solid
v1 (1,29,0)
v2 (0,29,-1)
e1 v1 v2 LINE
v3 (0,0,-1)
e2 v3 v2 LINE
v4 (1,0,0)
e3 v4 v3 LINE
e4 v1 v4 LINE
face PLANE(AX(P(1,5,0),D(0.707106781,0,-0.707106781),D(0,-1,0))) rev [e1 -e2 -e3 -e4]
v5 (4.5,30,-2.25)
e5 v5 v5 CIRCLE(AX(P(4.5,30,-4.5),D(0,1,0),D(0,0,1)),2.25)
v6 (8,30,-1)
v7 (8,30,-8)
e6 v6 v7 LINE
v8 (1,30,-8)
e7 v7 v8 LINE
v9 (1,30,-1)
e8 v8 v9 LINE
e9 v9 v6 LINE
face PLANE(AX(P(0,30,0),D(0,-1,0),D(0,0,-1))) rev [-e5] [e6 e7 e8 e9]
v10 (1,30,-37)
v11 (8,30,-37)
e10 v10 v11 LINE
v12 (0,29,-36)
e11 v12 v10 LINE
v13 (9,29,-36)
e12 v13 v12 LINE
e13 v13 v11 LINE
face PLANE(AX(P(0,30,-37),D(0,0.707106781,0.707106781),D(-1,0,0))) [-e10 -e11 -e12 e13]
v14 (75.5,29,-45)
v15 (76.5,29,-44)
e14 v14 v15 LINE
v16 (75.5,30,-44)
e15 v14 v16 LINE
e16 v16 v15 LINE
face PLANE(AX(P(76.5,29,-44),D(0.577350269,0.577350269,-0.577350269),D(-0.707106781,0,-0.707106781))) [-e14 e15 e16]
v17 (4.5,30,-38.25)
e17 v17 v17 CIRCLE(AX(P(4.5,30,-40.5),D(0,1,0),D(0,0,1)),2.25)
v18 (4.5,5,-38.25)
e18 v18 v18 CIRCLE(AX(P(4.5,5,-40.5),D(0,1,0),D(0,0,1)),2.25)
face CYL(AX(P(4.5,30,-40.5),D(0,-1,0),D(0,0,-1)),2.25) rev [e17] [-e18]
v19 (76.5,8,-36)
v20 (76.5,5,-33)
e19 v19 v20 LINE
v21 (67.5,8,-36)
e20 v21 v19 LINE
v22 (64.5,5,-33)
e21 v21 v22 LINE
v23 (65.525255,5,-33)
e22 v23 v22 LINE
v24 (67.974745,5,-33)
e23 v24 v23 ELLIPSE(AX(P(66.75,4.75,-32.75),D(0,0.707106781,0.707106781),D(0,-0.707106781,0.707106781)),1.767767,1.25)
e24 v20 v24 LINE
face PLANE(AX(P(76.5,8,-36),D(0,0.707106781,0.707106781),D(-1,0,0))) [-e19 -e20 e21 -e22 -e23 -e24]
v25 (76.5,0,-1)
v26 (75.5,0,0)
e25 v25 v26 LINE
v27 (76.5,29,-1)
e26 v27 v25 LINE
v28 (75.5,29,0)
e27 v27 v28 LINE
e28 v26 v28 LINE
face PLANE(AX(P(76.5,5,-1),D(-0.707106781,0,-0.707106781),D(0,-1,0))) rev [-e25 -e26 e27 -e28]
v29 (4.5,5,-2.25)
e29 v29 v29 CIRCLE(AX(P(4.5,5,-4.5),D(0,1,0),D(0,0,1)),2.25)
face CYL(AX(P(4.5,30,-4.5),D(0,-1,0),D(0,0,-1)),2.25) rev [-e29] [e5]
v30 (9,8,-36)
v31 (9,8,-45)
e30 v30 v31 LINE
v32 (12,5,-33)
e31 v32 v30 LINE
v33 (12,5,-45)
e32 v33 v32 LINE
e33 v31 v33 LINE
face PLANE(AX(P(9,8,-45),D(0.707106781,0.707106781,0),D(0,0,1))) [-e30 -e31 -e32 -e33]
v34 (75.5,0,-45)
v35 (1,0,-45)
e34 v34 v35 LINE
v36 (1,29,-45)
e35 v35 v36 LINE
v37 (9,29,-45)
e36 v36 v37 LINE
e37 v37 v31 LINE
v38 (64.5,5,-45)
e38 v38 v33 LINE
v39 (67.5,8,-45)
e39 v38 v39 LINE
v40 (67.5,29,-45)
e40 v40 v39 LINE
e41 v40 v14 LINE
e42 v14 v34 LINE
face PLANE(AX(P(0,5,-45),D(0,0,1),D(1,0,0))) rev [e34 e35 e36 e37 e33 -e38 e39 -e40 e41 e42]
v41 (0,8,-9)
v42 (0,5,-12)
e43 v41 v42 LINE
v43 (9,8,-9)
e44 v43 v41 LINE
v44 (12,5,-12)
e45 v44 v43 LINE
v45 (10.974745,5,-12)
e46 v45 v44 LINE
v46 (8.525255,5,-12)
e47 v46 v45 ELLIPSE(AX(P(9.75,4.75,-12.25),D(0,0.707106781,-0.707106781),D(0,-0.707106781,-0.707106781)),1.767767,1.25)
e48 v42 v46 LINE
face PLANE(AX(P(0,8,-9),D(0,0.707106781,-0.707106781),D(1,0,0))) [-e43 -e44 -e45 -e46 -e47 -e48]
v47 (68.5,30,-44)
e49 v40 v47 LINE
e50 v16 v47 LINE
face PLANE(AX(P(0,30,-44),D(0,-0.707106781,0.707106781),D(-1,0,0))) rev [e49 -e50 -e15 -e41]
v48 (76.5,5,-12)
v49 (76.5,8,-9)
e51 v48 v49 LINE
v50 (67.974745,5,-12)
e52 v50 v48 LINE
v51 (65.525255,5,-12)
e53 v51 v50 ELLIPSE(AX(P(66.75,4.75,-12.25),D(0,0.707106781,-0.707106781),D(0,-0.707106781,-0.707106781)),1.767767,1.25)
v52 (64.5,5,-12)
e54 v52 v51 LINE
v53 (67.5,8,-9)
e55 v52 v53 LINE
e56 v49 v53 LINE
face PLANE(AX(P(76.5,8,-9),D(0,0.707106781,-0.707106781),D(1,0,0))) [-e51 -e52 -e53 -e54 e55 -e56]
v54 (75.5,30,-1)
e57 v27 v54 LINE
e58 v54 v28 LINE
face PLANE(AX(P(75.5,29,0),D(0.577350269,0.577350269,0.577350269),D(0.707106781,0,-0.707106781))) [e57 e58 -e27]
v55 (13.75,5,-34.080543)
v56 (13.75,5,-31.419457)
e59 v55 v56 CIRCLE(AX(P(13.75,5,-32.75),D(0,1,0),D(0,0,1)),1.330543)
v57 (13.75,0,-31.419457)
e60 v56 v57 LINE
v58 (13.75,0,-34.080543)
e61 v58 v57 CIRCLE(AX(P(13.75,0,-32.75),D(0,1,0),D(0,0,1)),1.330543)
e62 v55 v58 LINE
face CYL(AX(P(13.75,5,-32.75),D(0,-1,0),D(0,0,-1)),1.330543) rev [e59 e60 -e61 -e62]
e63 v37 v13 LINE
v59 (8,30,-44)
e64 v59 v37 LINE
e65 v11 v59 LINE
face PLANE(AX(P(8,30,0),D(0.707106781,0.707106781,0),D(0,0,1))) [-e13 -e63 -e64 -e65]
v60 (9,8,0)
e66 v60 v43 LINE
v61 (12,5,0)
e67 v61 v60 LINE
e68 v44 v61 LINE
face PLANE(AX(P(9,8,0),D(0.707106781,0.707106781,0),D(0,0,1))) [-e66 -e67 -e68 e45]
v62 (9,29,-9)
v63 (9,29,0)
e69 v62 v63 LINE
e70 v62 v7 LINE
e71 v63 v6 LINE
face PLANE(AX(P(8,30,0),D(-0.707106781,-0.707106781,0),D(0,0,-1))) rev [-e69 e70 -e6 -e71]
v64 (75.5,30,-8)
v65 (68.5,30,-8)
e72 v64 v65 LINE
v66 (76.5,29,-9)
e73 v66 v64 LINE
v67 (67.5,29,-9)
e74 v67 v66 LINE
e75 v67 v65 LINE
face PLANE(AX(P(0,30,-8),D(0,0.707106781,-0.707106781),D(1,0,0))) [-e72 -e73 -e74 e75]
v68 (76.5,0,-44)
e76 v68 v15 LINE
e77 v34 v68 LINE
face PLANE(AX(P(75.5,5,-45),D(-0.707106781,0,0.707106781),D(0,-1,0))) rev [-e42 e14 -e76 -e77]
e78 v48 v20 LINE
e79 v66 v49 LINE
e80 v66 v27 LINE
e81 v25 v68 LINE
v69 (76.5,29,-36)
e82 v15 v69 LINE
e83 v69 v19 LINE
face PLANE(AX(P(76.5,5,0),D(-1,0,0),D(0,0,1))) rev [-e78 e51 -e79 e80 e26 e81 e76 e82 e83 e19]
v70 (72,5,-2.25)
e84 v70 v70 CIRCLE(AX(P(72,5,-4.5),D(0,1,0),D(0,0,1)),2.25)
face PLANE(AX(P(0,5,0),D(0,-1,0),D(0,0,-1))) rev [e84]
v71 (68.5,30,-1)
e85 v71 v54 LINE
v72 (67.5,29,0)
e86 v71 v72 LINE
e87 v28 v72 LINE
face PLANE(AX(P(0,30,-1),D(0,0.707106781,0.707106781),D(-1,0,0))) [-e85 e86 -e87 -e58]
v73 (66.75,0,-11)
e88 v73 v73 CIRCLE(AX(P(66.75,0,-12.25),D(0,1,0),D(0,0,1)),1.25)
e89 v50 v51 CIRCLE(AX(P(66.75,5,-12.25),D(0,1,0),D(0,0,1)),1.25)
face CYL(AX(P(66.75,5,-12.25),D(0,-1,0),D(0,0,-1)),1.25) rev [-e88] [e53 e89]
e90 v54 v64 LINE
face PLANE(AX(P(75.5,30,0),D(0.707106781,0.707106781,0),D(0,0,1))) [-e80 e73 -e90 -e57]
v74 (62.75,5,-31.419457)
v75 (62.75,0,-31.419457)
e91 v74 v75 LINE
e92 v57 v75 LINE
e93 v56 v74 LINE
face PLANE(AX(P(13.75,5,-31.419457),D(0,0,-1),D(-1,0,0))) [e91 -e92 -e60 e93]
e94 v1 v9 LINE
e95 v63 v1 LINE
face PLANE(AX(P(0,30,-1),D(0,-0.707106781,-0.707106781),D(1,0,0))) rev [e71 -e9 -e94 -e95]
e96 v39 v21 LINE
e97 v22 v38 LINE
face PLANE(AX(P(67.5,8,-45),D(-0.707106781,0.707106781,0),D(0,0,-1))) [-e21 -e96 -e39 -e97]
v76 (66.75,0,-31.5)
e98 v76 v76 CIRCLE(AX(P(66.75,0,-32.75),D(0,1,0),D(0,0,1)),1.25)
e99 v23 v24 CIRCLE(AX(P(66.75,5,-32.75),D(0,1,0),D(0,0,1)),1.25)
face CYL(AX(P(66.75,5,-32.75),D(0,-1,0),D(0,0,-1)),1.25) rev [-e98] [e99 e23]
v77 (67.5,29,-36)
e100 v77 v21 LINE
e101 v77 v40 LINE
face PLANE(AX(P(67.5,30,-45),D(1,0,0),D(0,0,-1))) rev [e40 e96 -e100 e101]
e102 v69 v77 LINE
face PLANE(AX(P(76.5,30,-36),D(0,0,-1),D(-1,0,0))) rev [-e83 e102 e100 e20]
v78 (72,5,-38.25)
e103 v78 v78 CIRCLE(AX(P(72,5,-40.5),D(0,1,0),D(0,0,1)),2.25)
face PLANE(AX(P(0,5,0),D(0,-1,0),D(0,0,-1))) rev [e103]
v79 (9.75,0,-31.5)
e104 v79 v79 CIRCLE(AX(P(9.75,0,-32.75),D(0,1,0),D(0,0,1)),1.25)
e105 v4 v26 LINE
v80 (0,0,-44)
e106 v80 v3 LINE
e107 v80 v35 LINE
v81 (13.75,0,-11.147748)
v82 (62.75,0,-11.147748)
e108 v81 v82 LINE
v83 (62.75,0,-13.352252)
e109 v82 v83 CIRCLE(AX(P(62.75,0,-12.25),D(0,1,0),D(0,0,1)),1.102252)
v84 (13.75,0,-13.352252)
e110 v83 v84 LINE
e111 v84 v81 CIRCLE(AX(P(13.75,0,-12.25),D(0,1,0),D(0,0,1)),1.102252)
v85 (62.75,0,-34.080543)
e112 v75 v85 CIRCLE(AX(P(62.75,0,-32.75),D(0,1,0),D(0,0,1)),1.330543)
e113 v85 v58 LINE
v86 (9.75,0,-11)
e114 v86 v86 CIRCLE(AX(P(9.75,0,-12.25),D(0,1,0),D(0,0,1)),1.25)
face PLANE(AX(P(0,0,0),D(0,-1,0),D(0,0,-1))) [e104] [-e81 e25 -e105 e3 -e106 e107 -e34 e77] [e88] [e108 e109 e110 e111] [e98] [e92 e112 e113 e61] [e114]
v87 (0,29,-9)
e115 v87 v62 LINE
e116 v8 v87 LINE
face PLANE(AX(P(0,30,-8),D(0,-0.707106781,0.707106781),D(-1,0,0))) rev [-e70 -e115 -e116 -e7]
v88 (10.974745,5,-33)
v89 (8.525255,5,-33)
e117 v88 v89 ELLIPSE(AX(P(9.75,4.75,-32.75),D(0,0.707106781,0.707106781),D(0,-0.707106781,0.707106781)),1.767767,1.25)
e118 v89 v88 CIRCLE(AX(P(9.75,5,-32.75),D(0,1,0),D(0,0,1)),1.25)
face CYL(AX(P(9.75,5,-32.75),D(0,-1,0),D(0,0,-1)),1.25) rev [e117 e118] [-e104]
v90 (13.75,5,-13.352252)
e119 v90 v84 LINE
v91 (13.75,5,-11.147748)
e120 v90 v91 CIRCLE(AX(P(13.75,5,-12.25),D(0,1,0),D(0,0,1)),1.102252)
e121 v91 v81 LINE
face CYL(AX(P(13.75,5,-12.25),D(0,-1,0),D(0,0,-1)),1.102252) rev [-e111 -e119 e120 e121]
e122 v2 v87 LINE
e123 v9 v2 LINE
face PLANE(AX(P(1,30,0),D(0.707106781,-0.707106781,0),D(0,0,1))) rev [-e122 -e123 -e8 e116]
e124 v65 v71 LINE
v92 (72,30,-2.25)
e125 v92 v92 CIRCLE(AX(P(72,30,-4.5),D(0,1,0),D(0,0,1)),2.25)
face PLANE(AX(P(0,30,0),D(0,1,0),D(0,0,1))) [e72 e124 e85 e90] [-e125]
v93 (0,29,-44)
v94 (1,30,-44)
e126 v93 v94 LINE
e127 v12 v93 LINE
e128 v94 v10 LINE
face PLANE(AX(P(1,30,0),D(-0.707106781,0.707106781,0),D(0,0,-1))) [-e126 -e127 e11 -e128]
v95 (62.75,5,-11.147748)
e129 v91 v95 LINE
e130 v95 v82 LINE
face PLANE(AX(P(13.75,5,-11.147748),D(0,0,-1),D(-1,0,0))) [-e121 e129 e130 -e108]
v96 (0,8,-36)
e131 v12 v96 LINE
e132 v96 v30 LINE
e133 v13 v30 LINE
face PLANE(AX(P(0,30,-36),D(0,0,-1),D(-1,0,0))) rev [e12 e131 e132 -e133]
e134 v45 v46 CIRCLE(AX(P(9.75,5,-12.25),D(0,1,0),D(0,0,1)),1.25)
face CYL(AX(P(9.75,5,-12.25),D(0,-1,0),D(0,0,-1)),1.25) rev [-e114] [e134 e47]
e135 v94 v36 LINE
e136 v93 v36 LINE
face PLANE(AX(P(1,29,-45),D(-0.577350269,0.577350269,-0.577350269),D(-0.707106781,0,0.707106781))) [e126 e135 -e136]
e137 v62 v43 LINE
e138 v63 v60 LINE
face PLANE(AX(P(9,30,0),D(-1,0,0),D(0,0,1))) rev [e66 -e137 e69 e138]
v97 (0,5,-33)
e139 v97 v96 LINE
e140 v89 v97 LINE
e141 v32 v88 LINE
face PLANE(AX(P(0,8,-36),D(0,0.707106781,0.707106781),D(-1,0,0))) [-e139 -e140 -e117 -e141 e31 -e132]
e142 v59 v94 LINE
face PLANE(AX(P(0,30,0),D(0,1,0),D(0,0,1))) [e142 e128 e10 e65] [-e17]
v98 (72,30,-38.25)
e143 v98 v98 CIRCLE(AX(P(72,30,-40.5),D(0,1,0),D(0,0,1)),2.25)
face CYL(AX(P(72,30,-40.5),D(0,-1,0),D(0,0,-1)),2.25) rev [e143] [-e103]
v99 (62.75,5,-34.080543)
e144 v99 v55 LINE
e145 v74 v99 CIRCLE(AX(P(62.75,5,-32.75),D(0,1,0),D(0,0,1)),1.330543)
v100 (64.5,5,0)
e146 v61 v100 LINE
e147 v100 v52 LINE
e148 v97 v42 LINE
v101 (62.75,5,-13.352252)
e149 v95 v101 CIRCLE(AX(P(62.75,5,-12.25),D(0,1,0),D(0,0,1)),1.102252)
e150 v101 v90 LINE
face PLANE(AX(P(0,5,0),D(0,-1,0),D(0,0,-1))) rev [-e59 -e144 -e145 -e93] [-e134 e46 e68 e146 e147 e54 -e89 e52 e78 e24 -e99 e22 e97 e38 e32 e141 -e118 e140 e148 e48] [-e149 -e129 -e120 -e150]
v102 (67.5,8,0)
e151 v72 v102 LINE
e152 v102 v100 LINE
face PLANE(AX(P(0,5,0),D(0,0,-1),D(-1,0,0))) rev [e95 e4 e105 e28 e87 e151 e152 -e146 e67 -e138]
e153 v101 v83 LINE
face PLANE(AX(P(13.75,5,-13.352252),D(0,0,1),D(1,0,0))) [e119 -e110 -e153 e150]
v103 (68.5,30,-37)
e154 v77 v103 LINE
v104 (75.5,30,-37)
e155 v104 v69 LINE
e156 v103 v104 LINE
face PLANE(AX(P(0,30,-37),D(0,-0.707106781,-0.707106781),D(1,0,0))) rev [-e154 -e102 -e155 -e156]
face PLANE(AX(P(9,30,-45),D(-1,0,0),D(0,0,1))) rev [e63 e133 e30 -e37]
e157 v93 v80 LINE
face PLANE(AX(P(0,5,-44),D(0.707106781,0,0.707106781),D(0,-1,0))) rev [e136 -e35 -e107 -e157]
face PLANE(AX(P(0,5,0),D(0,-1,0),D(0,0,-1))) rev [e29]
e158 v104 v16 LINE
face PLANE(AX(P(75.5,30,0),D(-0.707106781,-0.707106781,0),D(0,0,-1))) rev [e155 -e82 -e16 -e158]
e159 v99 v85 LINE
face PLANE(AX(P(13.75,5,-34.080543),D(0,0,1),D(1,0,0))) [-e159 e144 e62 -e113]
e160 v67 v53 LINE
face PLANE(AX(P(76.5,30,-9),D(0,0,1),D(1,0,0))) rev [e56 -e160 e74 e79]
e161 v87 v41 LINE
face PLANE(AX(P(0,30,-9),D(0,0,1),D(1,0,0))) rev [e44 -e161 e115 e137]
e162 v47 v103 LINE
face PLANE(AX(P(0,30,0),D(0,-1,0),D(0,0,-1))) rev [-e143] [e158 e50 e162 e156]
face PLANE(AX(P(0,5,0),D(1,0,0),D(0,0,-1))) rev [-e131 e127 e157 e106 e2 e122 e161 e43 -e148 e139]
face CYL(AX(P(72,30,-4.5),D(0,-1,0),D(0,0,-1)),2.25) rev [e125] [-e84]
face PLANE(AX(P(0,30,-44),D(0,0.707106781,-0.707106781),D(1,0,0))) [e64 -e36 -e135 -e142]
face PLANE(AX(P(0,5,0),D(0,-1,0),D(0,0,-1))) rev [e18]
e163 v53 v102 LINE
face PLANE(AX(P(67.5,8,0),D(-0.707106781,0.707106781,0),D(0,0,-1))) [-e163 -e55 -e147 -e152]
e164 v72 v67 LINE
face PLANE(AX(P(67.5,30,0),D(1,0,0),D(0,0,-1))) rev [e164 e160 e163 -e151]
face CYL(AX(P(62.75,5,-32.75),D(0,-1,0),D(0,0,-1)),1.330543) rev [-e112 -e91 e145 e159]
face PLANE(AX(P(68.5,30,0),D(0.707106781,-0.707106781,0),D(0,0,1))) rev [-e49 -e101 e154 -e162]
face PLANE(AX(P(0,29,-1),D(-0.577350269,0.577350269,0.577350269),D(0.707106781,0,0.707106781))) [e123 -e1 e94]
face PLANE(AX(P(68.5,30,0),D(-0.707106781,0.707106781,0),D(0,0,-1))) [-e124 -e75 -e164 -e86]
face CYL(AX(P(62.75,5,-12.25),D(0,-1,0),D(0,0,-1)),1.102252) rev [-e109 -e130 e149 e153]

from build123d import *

# Parameters (mm, degrees)
SKETCH1_W           = 76.5
SKETCH1_H           = 45
SKETCH1_R           = 1.25
BOSS_EXTRUDE1_DEPTH = 5
SKETCH2_W           = 9
SKETCH2_H           = 9
SKETCH2_R           = 2.25
BOSS_EXTRUDE2_DEPTH = 25
CHAMFER1_SIZE       = 1
CHAMFER2_SIZE       = 3


with BuildPart() as part:
    # Sketch1 → Boss-Extrude1 (new body)
    with BuildSketch(Plane(origin=(0, 0, 0), x_dir=(1, 0, 0), z_dir=(0, 1, 0))):
        with Locations((38.25, 22.5)):
            Rectangle(SKETCH1_W, SKETCH1_H)
        with Locations(Location((9.75, 32.75, 0), (0, 0, 270))):
            Circle(SKETCH1_R, mode=Mode.SUBTRACT)
        with Locations(Location((9.75, 12.25, 0), (0, 0, 270))):
            Circle(SKETCH1_R, mode=Mode.SUBTRACT)
        with Locations(Location((66.75, 12.25, 0), (0, 0, 270))):
            Circle(SKETCH1_R, mode=Mode.SUBTRACT)
        with Locations(Location((66.75, 32.75, 0), (0, 0, 270))):
            Circle(SKETCH1_R, mode=Mode.SUBTRACT)
        with BuildLine():
            Line((13.75, 34.080542855), (62.75, 34.080542855))
            ThreePointArc((62.75, 34.080542855), (64.080542855, 32.75), (62.75, 31.419457145))
            Line((62.75, 31.419457145), (13.75, 31.419457145))
            ThreePointArc((13.75, 31.419457145), (12.419457145, 32.75), (13.75, 34.080542855))
        make_face(mode=Mode.SUBTRACT)
        with BuildLine():
            Line((13.75, 13.352251527), (62.75, 13.352251527))
            ThreePointArc((62.75, 13.352251527), (63.852251527, 12.25), (62.75, 11.147748473))
            Line((62.75, 11.147748473), (13.75, 11.147748473))
            ThreePointArc((13.75, 11.147748473), (12.647748473, 12.25), (13.75, 13.352251527))
        make_face(mode=Mode.SUBTRACT)
    extrude(amount=BOSS_EXTRUDE1_DEPTH)

    # Sketch2 → Boss-Extrude2 (add)
    # profile 1 of 4: a face of its own
    with BuildSketch(Plane(origin=(0, 5, 0), x_dir=(1, 0, 0), z_dir=(0, 1, 0))):
        with Locations((4.5, 40.5)):
            Rectangle(SKETCH2_W, SKETCH2_H)
        with Locations(Location((4.5, 40.5, 0), (0, 0, 270))):
            Circle(SKETCH2_R, mode=Mode.SUBTRACT)
    # profile 2 of 4: a face of its own
    with BuildSketch(Plane(origin=(0, 5, 0), x_dir=(1, 0, 0), z_dir=(0, 1, 0))):
        with Locations((4.5, 4.5)):
            Rectangle(SKETCH2_W, SKETCH2_H)
        with Locations(Location((4.5, 4.5, 0), (0, 0, 270))):
            Circle(SKETCH2_R, mode=Mode.SUBTRACT)
    # profile 3 of 4: a face of its own
    with BuildSketch(Plane(origin=(0, 5, 0), x_dir=(1, 0, 0), z_dir=(0, 1, 0))):
        with Locations((72, 4.5)):
            Rectangle(SKETCH2_W, SKETCH2_H)
        with Locations(Location((72, 4.5, 0), (0, 0, 270))):
            Circle(SKETCH2_R, mode=Mode.SUBTRACT)
    # profile 4 of 4: a face of its own
    with BuildSketch(Plane(origin=(0, 5, 0), x_dir=(1, 0, 0), z_dir=(0, 1, 0))):
        with Locations((72, 40.5)):
            Rectangle(SKETCH2_W, SKETCH2_H)
        with Locations(Location((72, 40.5, 0), (0, 0, 270))):
            Circle(SKETCH2_R, mode=Mode.SUBTRACT)
    extrude(amount=BOSS_EXTRUDE2_DEPTH)

    # Chamfer1
    chamfer1_edges = [part.edges().sort_by_distance(p)[0] for p in [
        (76.5, 30, -40.5),
        (72, 30, -45),
        (67.5, 30, -40.5),
        (72, 30, -36),
        (0, 30, -40.5),
        (4.5, 30, -36),
        (9, 30, -40.5),
        (4.5, 30, -45),
        (0, 30, -4.5),
        (4.5, 30, 0),
        (9, 30, -4.5),
        (4.5, 30, -9),
        (0, 15, -45),
        (76.5, 15, -45),
        (76.5, 15, 0),
        (0, 15, 0),
        (76.5, 30, -4.5),
        (72, 30, -9),
        (67.5, 30, -4.5),
        (72, 30, 0),
    ]]
    chamfer(chamfer1_edges, length=CHAMFER1_SIZE)

    # Chamfer2
    # the kernel refuses this chamfer: 3 mm, written as the material it adds along each edge
    with BuildSketch(Plane(origin=(67.5, 5, -45), x_dir=(-1, 0, 0), z_dir=(0, 0, 1))) as chamfer2_piece_1_section:
        Polygon((CHAMFER2_SIZE, 0), (0, -CHAMFER2_SIZE), (0, 0), align=None)
    chamfer2_piece_1 = extrude(amount=16.715048964, mode=Mode.PRIVATE)
    chamfer2_piece_1 = chamfer2_piece_1 - Plane(origin=(66.75, 5, -32.75), x_dir=(0, 0, 1), z_dir=(0, -1, 0)) * Cylinder(1.25, 46, mode=Mode.PRIVATE)
    chamfer2_piece_1 = split(chamfer2_piece_1, bisect_by=Plane(origin=(67.5, 11, -39), z_dir=(0, -0.7071067811865476, -0.7071067811865476)), keep=Keep.TOP, mode=Mode.PRIVATE)
    add(chamfer2_piece_1)
    with BuildSketch(Plane(origin=(59.784951036, 5, -36), x_dir=(0, 0, 1), z_dir=(1, 0, 0))) as chamfer2_piece_2_section:
        Polygon((CHAMFER2_SIZE, 0), (0, -CHAMFER2_SIZE), (0, 0), align=None)
    chamfer2_piece_2 = extrude(amount=16.715048964, mode=Mode.PRIVATE)
    chamfer2_piece_2 = chamfer2_piece_2 - Plane(origin=(66.75, 5, -32.75), x_dir=(0, 0, 1), z_dir=(0, -1, 0)) * Cylinder(1.25, 46, mode=Mode.PRIVATE)
    chamfer2_piece_2 = split(chamfer2_piece_2, bisect_by=Plane(origin=(62.142475518, 2.642475518, -36), z_dir=(0.7071067811865476, -0.7071067811865476, 1.1165101928417953e-15)), keep=Keep.TOP, mode=Mode.PRIVATE)
    add(chamfer2_piece_2)
    with BuildSketch(Plane(origin=(16.715048964, 5, -36), x_dir=(0, 0, 1), z_dir=(-1, 0, 0))) as chamfer2_piece_3_section:
        Polygon((CHAMFER2_SIZE, 0), (0, CHAMFER2_SIZE), (0, 0), align=None)
    chamfer2_piece_3 = extrude(amount=16.715048964, mode=Mode.PRIVATE)
    chamfer2_piece_3 = chamfer2_piece_3 - Plane(origin=(9.75, 5, -32.75), x_dir=(0, 0, 1), z_dir=(0, -1, 0)) * Cylinder(1.25, 46, mode=Mode.PRIVATE)
    chamfer2_piece_3 = split(chamfer2_piece_3, bisect_by=Plane(origin=(14.357524482, 2.642475518, -36), z_dir=(-0.7071067811865476, -0.7071067811865476, 0)), keep=Keep.TOP, mode=Mode.PRIVATE)
    add(chamfer2_piece_3)
    with BuildSketch(Plane(origin=(9, 5, -45), x_dir=(1, 0, 0), z_dir=(0, 0, 1))) as chamfer2_piece_4_section:
        Polygon((CHAMFER2_SIZE, 0), (0, CHAMFER2_SIZE), (0, 0), align=None)
    chamfer2_piece_4 = extrude(amount=16.715048964, mode=Mode.PRIVATE)
    chamfer2_piece_4 = chamfer2_piece_4 - Plane(origin=(9.75, 5, -32.75), x_dir=(0, 0, 1), z_dir=(0, -1, 0)) * Cylinder(1.25, 46, mode=Mode.PRIVATE)
    chamfer2_piece_4 = split(chamfer2_piece_4, bisect_by=Plane(origin=(9, 11, -39), z_dir=(0, -0.7071067811865476, -0.7071067811865476)), keep=Keep.TOP, mode=Mode.PRIVATE)
    add(chamfer2_piece_4)
    with BuildSketch(Plane(origin=(9, 5, 0), x_dir=(0, 1, 0), z_dir=(0, 0, -1))) as chamfer2_piece_5_section:
        Polygon((CHAMFER2_SIZE, 0), (0, CHAMFER2_SIZE), (0, 0), align=None)
    chamfer2_piece_5 = extrude(amount=16.715048964, mode=Mode.PRIVATE)
    chamfer2_piece_5 = chamfer2_piece_5 - Plane(origin=(9.75, 5, -12.25), x_dir=(0, 0, 1), z_dir=(0, -1, 0)) * Cylinder(1.25, 46, mode=Mode.PRIVATE)
    chamfer2_piece_5 = split(chamfer2_piece_5, bisect_by=Plane(origin=(9, 11, -6), z_dir=(0, -0.7071067811865476, 0.7071067811865476)), keep=Keep.TOP, mode=Mode.PRIVATE)
    add(chamfer2_piece_5)
    with BuildSketch(Plane(origin=(16.715048964, 5, -9), x_dir=(0, 0, -1), z_dir=(-1, 0, 0))) as chamfer2_piece_6_section:
        Polygon((CHAMFER2_SIZE, 0), (0, -CHAMFER2_SIZE), (0, 0), align=None)
    chamfer2_piece_6 = extrude(amount=16.715048964, mode=Mode.PRIVATE)
    chamfer2_piece_6 = chamfer2_piece_6 - Plane(origin=(9.75, 5, -12.25), x_dir=(0, 0, 1), z_dir=(0, -1, 0)) * Cylinder(1.25, 46, mode=Mode.PRIVATE)
    chamfer2_piece_6 = split(chamfer2_piece_6, bisect_by=Plane(origin=(14.357524482, 2.642475518, -9), z_dir=(-0.7071067811865474, -0.7071067811865478, 0)), keep=Keep.TOP, mode=Mode.PRIVATE)
    add(chamfer2_piece_6)
    with BuildSketch(Plane(origin=(59.784951036, 5, -9), x_dir=(0, 0, -1), z_dir=(1, 0, 0))) as chamfer2_piece_7_section:
        Polygon((CHAMFER2_SIZE, 0), (0, CHAMFER2_SIZE), (0, 0), align=None)
    chamfer2_piece_7 = extrude(amount=16.715048964, mode=Mode.PRIVATE)
    chamfer2_piece_7 = chamfer2_piece_7 - Plane(origin=(66.75, 5, -12.25), x_dir=(0, 0, 1), z_dir=(0, -1, 0)) * Cylinder(1.25, 46, mode=Mode.PRIVATE)
    chamfer2_piece_7 = split(chamfer2_piece_7, bisect_by=Plane(origin=(62.142475518, 2.642475518, -9), z_dir=(0.7071067811865476, -0.7071067811865476, 0)), keep=Keep.TOP, mode=Mode.PRIVATE)
    add(chamfer2_piece_7)
    with BuildSketch(Plane(origin=(67.5, 5, 0), x_dir=(-1, 0, 0), z_dir=(0, 0, -1))) as chamfer2_piece_8_section:
        Polygon((CHAMFER2_SIZE, 0), (0, CHAMFER2_SIZE), (0, 0), align=None)
    chamfer2_piece_8 = extrude(amount=16.715048964, mode=Mode.PRIVATE)
    chamfer2_piece_8 = chamfer2_piece_8 - Plane(origin=(66.75, 5, -12.25), x_dir=(0, 0, 1), z_dir=(0, -1, 0)) * Cylinder(1.25, 46, mode=Mode.PRIVATE)
    chamfer2_piece_8 = split(chamfer2_piece_8, bisect_by=Plane(origin=(67.5, 11, -6), z_dir=(0, -0.7071067811865476, 0.7071067811865476)), keep=Keep.TOP, mode=Mode.PRIVATE)
    add(chamfer2_piece_8)


solid = part.part
